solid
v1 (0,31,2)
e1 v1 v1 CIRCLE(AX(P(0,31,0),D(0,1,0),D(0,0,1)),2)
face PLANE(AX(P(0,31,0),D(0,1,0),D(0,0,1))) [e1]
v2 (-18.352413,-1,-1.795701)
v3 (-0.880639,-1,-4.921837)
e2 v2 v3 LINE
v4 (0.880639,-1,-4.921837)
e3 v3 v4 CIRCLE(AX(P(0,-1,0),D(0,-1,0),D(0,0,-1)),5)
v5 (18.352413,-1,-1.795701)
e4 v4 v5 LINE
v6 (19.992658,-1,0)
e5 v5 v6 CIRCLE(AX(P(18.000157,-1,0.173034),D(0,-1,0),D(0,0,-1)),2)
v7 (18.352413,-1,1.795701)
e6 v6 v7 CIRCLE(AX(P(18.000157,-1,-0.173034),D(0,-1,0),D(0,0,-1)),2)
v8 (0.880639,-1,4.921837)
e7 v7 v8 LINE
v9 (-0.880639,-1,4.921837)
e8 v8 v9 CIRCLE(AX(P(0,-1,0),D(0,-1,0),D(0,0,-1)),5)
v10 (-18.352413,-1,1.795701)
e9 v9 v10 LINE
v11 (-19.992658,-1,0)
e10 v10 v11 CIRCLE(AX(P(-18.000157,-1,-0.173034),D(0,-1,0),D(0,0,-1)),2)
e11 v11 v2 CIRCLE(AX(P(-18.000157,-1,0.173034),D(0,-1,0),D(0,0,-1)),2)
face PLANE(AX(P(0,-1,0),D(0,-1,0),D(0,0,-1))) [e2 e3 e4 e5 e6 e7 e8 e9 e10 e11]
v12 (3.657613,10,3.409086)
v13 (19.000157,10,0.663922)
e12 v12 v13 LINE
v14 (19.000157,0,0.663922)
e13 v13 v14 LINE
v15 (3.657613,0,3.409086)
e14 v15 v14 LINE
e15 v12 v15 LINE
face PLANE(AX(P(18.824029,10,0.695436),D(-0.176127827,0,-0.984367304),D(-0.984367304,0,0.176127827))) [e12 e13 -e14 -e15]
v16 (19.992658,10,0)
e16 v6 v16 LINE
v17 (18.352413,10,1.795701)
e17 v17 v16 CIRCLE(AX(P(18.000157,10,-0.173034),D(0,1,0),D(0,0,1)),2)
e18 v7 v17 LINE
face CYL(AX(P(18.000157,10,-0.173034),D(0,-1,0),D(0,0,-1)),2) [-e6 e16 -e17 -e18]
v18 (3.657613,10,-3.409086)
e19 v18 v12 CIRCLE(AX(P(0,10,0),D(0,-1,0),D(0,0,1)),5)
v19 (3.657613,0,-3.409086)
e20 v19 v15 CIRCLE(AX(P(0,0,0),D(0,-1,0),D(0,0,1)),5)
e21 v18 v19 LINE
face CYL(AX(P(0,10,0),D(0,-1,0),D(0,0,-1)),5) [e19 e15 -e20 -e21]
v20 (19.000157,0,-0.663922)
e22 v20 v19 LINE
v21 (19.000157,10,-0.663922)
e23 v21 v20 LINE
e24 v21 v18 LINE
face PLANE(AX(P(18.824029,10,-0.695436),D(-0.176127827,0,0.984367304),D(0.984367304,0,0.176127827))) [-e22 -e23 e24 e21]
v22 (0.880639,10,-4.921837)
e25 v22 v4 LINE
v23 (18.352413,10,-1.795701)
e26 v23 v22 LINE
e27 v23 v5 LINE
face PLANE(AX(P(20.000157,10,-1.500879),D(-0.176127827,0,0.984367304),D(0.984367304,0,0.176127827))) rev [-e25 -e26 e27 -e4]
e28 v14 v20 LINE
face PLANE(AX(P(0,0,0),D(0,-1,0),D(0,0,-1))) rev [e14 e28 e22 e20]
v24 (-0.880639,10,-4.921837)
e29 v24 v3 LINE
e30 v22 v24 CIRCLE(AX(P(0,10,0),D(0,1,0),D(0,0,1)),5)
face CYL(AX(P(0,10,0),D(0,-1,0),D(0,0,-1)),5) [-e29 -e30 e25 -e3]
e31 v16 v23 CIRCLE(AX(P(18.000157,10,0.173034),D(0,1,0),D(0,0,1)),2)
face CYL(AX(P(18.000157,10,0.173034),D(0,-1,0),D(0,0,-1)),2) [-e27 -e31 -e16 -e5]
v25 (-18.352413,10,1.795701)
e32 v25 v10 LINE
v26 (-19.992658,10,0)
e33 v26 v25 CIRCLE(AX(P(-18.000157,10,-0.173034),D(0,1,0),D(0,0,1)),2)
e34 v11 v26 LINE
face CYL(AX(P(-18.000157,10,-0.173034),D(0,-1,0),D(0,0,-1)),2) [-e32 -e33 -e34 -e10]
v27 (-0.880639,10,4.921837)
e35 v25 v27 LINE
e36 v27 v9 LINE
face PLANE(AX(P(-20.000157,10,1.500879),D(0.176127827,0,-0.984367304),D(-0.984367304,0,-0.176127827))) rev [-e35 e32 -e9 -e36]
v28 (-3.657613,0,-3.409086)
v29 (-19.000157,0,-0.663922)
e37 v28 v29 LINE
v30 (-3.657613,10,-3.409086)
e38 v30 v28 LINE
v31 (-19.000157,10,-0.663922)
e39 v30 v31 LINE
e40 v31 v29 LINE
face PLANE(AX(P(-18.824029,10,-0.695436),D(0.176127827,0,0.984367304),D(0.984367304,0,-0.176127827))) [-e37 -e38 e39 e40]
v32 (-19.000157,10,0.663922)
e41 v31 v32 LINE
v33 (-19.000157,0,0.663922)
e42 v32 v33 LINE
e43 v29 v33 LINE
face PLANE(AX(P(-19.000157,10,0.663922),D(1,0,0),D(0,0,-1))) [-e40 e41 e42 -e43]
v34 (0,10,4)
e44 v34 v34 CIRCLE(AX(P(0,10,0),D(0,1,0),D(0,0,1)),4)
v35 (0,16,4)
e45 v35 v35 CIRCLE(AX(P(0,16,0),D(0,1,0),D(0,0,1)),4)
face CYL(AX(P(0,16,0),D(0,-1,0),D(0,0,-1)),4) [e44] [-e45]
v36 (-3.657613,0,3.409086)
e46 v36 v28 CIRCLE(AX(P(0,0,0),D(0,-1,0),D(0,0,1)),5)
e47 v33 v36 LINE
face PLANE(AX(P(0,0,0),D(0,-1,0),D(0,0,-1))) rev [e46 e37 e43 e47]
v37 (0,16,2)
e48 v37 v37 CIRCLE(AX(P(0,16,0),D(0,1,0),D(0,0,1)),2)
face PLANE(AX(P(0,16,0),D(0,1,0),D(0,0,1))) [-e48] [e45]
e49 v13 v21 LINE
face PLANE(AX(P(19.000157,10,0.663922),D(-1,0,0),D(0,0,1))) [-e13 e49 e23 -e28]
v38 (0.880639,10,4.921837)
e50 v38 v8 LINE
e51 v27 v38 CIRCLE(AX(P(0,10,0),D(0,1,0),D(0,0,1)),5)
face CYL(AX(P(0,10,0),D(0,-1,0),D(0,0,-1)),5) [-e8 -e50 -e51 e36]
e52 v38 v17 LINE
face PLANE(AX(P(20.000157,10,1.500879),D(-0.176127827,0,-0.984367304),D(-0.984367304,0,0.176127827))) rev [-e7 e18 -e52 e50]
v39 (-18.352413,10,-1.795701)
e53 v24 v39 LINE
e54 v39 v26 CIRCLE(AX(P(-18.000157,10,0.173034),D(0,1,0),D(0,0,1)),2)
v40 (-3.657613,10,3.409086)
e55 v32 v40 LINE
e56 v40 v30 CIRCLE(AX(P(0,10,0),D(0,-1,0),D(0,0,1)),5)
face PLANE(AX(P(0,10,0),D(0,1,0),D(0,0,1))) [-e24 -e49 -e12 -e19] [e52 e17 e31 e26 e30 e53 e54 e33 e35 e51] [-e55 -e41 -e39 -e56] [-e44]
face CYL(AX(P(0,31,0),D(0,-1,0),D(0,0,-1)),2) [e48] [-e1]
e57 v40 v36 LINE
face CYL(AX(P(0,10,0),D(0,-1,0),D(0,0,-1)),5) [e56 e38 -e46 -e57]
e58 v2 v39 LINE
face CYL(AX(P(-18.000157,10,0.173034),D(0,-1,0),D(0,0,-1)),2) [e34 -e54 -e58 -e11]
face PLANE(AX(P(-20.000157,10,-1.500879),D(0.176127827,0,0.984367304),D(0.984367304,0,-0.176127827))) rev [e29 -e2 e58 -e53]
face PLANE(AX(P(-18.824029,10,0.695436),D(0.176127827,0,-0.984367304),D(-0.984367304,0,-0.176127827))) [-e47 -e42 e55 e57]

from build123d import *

# Parameters (mm, degrees)
BOSS_EXTRUDE1_DEPTH = 10
BOSS_EXTRUDE2_START = 1
BOSS_EXTRUDE2_DEPTH = 1
SKETCH3_R           = 4
BOSS_EXTRUDE3_DEPTH = 6
SKETCH4_R           = 2
BOSS_EXTRUDE4_DEPTH = 15
FILLET1_R           = 2


with BuildPart() as part:
    # Sketch1 → Boss-Extrude1 (new body)
    with BuildSketch(Plane(origin=(0, 0, 0), x_dir=(1, 0, 0), z_dir=(0, 1, 0))):
        with BuildLine():
            Line((-20.000157194, 1.500878546), (-20.000157194, -1.500878546))
            Line((-20.000157194, -1.500878546), (-0.880639137, -4.921836518))
            ThreePointArc((-0.880639137, -4.921836518), (0, -5), (0.880639137, -4.921836518))
            Line((0.880639137, -4.921836518), (20.000157194, -1.500878546))
            Line((20.000157194, -1.500878546), (20.000157194, 1.500878546))
            Line((20.000157194, 1.500878546), (0.880639137, 4.921836518))
            ThreePointArc((0.880639137, 4.921836518), (0, 5), (-0.880639137, 4.921836518))
            Line((-0.880639137, 4.921836518), (-20.000157194, 1.500878546))
        make_face()
        with BuildLine():
            Line((-19.000157194, -0.663922493), (-19.000157194, 0.663922493))
            Line((-19.000157194, 0.663922493), (-18.824029366, 0.695436148))
            Line((-18.824029366, 0.695436148), (-3.65761322, 3.409085733))
            ThreePointArc((-3.65761322, 3.409085733), (-5, 0), (-3.65761322, -3.409085733))
            Line((-3.65761322, -3.409085733), (-18.824029366, -0.695436148))
            Line((-18.824029366, -0.695436148), (-19.000157194, -0.663922493))
        make_face(mode=Mode.SUBTRACT)
        with BuildLine():
            Line((18.824029366, 0.695436148), (19.000157194, 0.663922493))
            Line((19.000157194, 0.663922493), (19.000157194, -0.663922493))
            Line((19.000157194, -0.663922493), (18.824029366, -0.695436148))
            Line((18.824029366, -0.695436148), (3.65761322, -3.409085733))
            ThreePointArc((3.65761322, -3.409085733), (5, 0), (3.65761322, 3.409085733))
            Line((3.65761322, 3.409085733), (18.824029366, 0.695436148))
        make_face(mode=Mode.SUBTRACT)
    extrude(amount=BOSS_EXTRUDE1_DEPTH)

    # Sketch2 → Boss-Extrude2 (add)
    with BuildSketch(Plane.XZ.offset(BOSS_EXTRUDE2_START)):
        with BuildLine():
            Line((-20.000157194, 1.500878546), (-0.880639137, 4.921836518))
            ThreePointArc((-0.880639137, 4.921836518), (0, 5), (0.880639137, 4.921836518))
            Line((0.880639137, 4.921836518), (20.000157194, 1.500878546))
            Line((20.000157194, 1.500878546), (20.000157194, -1.500878546))
            Line((20.000157194, -1.500878546), (0.880639137, -4.921836518))
            ThreePointArc((0.880639137, -4.921836518), (0, -5), (-0.880639137, -4.921836518))
            Line((-0.880639137, -4.921836518), (-20.000157194, -1.500878546))
            Line((-20.000157194, -1.500878546), (-20.000157194, 1.500878546))
        make_face()
    extrude(amount=-BOSS_EXTRUDE2_DEPTH)

    # Sketch3 → Boss-Extrude3 (add)
    with BuildSketch(Plane(origin=(0, 10, 0), x_dir=(1, 0, 0), z_dir=(0, 1, 0))):
        with Locations(Location((0, 0, 0), (0, 0, 270))):
            Circle(SKETCH3_R)
    extrude(amount=BOSS_EXTRUDE3_DEPTH)

    # Sketch4 → Boss-Extrude4 (add)
    with BuildSketch(Plane(origin=(0, 16, 0), x_dir=(1, 0, 0), z_dir=(0, 1, 0))):
        with Locations(Location((0, 0, 0), (0, 0, 270))):
            Circle(SKETCH4_R)
    extrude(amount=BOSS_EXTRUDE4_DEPTH)

    # Fillet1
    # the kernel refuses this fillet: 2 mm, written as the material it takes off along each edge
    with BuildSketch(Plane(origin=(20.000157194, -5.184780263, 1.500878546), x_dir=(-0.9843673036221247, 0, 0.17612782732920945), z_dir=(0, 1, 0)), Plane(origin=(20.000157194, -5.184780263, -1.500878546), x_dir=(0, 0, 1), z_dir=(0, 1, 0)), Plane(origin=(-20.000157194, 14.184780263, 1.500878546), x_dir=(0.9843673036221245, 0, 0.17612782732920956), z_dir=(0, -1, 0))) as fillet1_piece_1:
        with BuildLine():
            CenterArc((FILLET1_R * 0.836956052521, -FILLET1_R), FILLET1_R, 90, 79.855702636)
            Line((-FILLET1_R * 0.147411251101, -FILLET1_R * 0.823872172671), (0, 0))
            Line((0, 0), (FILLET1_R * 0.836956052521, 0))
        make_face()
    extrude(amount=19.369560525, mode=Mode.SUBTRACT)
    with BuildSketch(Plane(origin=(-20.000157194, -5.184780263, -1.500878546), x_dir=(0, 0, 1), z_dir=(0, 1, 0))) as fillet1_piece_2:
        with BuildLine():
            CenterArc((FILLET1_R * 0.836956052521, FILLET1_R), FILLET1_R, 190.144297364, 79.855702636)
            Line((-FILLET1_R * 0.147411251101, FILLET1_R * 0.823872172671), (0, 0))
            Line((0, 0), (FILLET1_R * 0.836956052521, 0))
        make_face()
    extrude(amount=19.369560525, mode=Mode.SUBTRACT)


solid = part.part
